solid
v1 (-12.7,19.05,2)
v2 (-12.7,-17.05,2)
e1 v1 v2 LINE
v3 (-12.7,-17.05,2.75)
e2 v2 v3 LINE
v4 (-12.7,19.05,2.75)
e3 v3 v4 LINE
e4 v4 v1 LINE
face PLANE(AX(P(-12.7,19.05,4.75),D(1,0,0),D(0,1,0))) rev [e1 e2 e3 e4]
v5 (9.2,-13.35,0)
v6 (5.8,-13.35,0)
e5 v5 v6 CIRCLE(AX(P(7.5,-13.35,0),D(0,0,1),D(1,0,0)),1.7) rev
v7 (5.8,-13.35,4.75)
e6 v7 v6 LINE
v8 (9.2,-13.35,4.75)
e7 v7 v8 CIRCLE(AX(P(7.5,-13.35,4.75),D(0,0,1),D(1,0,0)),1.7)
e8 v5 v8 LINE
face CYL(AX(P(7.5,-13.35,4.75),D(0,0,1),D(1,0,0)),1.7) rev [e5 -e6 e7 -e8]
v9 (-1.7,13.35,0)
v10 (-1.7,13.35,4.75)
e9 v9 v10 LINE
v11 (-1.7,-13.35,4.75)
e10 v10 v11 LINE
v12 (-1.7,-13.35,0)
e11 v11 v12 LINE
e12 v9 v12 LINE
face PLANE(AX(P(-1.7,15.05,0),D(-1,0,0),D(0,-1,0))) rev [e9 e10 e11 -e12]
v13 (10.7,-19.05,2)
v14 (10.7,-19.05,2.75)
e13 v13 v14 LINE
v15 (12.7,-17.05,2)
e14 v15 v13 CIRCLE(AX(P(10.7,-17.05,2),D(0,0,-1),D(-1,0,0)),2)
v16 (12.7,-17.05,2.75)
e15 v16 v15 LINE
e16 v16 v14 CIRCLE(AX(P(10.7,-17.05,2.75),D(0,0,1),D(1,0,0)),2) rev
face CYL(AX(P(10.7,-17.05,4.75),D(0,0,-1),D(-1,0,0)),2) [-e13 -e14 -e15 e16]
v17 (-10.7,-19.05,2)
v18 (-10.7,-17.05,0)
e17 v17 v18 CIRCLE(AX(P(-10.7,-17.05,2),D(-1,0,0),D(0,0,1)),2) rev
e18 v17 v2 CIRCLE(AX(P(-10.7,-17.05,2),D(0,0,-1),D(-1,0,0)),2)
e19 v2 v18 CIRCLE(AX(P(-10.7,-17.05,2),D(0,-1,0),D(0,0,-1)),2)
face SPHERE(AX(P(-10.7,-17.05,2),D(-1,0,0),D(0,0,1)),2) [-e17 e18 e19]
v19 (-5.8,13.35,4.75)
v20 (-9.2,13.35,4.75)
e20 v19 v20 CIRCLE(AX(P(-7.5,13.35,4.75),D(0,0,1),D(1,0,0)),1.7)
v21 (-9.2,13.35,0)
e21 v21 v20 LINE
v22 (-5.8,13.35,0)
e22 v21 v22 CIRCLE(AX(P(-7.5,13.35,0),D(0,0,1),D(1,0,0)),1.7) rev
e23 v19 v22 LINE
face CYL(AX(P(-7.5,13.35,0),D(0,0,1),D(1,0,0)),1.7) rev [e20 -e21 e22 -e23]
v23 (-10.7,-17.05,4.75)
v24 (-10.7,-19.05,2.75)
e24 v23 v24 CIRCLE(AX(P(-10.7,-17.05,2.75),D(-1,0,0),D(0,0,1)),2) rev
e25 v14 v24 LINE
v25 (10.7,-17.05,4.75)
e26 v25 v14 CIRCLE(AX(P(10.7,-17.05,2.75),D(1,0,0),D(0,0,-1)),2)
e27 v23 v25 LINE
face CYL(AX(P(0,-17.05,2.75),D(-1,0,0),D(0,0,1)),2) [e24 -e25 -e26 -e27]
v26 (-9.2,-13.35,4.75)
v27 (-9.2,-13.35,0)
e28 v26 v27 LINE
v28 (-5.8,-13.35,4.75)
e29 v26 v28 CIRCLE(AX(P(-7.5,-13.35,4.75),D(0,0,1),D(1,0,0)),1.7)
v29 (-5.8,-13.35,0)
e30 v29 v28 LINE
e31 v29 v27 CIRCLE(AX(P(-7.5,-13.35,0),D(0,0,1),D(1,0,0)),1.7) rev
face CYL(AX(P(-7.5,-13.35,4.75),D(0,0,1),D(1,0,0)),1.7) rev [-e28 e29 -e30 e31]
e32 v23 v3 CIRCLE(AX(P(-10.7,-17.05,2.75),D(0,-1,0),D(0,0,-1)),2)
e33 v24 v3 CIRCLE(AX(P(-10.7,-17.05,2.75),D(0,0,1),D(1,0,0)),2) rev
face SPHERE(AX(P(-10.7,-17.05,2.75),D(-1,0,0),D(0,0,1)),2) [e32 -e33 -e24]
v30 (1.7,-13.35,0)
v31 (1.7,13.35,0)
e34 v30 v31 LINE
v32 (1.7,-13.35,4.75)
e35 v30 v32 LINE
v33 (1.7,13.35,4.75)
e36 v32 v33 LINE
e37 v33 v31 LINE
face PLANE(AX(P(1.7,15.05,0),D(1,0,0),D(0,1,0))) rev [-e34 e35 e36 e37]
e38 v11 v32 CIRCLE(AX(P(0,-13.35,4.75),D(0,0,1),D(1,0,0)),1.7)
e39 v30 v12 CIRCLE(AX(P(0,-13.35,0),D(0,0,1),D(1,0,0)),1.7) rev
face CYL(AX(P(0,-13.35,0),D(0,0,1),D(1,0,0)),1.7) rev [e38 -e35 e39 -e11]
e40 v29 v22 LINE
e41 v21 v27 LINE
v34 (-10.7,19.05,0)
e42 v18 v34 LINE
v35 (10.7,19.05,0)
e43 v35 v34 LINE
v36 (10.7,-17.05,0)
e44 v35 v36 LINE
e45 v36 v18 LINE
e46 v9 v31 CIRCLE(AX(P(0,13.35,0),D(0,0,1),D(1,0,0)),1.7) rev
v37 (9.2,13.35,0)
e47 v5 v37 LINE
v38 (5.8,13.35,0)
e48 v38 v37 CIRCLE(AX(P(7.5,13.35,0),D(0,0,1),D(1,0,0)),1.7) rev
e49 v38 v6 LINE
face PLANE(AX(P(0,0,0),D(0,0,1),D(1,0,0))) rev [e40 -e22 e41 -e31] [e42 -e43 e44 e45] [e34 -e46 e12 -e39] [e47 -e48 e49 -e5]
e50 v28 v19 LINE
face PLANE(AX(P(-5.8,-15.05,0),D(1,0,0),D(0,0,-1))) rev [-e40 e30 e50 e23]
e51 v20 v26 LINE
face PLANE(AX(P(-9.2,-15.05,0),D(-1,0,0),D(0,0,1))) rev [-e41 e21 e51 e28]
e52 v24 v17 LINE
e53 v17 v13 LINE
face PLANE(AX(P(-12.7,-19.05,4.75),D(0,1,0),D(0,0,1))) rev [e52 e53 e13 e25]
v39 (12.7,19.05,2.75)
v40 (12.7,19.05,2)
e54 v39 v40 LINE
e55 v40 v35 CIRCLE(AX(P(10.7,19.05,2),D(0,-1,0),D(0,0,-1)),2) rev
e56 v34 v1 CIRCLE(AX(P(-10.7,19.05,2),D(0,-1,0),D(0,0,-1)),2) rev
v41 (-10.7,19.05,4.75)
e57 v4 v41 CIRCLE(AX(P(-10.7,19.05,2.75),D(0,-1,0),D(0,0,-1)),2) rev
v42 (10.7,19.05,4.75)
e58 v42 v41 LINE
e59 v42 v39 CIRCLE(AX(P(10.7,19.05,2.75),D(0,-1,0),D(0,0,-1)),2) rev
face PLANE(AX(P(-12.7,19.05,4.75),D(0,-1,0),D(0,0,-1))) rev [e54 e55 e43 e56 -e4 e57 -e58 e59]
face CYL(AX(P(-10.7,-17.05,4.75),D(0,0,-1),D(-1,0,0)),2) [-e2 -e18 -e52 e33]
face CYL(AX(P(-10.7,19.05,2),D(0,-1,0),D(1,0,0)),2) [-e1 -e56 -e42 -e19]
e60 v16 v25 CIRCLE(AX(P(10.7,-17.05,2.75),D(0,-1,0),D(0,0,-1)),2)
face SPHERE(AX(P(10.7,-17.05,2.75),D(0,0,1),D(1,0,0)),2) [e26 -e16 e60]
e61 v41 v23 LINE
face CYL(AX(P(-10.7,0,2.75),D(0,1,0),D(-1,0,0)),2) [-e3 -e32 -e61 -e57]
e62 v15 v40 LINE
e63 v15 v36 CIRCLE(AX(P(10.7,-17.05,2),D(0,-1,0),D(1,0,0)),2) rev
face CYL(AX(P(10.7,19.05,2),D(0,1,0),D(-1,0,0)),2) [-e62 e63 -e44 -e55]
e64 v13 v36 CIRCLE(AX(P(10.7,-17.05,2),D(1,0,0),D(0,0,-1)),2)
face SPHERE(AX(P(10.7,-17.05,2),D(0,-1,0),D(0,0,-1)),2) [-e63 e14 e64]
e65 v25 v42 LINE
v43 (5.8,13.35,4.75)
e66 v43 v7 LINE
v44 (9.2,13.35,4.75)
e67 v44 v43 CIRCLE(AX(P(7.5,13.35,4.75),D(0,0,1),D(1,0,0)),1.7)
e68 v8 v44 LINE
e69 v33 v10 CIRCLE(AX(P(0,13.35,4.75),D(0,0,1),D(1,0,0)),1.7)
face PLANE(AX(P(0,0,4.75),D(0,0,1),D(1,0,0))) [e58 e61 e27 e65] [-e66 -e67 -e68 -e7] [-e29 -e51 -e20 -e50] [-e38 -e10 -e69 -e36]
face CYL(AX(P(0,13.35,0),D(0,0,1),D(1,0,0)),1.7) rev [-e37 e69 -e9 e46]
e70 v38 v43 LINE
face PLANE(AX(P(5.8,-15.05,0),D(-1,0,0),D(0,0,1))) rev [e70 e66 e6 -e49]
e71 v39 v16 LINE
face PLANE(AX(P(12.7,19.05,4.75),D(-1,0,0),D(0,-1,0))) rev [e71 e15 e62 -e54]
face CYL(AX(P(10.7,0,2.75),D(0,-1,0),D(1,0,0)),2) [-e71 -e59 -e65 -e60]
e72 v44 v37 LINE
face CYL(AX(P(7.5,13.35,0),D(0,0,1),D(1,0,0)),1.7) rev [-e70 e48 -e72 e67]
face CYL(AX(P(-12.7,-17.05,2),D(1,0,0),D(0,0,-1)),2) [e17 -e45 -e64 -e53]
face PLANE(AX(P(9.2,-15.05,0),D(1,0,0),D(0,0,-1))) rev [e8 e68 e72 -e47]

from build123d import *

# Parameters (mm, degrees)
SKETCH1_W           = 25.4
SKETCH1_H           = 38.1
BOSS_EXTRUDE1_DEPTH = 4.75
SKETCH2_W           = 3.4
SKETCH2_H           = 30.1
CUT_EXTRUDE1_DEPTH  = 24.382792819
FILLET1_R           = 1.7
FILLET2_R           = 1.7
FILLET3_R           = 1.7
FILLET4_R           = 1.7
FILLET5_R           = 2
FILLET6_R           = 1.7
FILLET7_R           = 1.7


with BuildPart() as part:
    # Sketch1 → Boss-Extrude1 (new body)
    with BuildSketch(Plane.XY):
        Rectangle(SKETCH1_W, SKETCH1_H)
    extrude(amount=BOSS_EXTRUDE1_DEPTH)

    # Sketch2 → Cut-Extrude1 (cut, through all)
    with BuildSketch(Plane.XY.offset(4.75)):
        with Locations((7.5, 0)):
            Rectangle(SKETCH2_W, SKETCH2_H)
        with Locations((-7.5, 0)):
            Rectangle(SKETCH2_W, SKETCH2_H)
        Rectangle(SKETCH2_W, SKETCH2_H)
    extrude(amount=-CUT_EXTRUDE1_DEPTH, mode=Mode.SUBTRACT)

    # Fillet1
    fillet1_edges = [part.edges().sort_by_distance(p)[0] for p in [
        (-5.8, 15.05, 2.375),
        (-9.2, 15.05, 2.375),
    ]]
    fillet(fillet1_edges, radius=FILLET1_R - 0.0001)  # a hair under: the kernel refuses the full size

    # Fillet2
    fillet2_edges = [part.edges().sort_by_distance(p)[0] for p in [
        (-5.8, -15.05, 2.375),
        (-9.2, -15.05, 2.375),
    ]]
    fillet(fillet2_edges, radius=FILLET2_R - 0.0001)  # a hair under: the kernel refuses the full size

    # Fillet3
    fillet3_edges = [part.edges().sort_by_distance(p)[0] for p in [
        (9.2, 15.05, 2.375),
        (5.8, 15.05, 2.375),
    ]]
    fillet(fillet3_edges, radius=FILLET3_R - 0.0001)  # a hair under: the kernel refuses the full size

    # Fillet4
    fillet4_edges = [part.edges().sort_by_distance(p)[0] for p in [
        (9.2, -15.05, 2.375),
        (5.8, -15.05, 2.375),
    ]]
    fillet(fillet4_edges, radius=FILLET4_R - 0.0001)  # a hair under: the kernel refuses the full size

    # Fillet5
    fillet5_edges = [part.edges().sort_by_distance(p)[0] for p in [
        (-12.7, 0, 4.75),
        (0, -19.05, 4.75),
        (12.7, 0, 4.75),
        (0, -19.05, 0),
        (-12.7, 0, 0),
        (12.7, 0, 0),
        (12.7, -19.05, 2.375),
        (-12.7, -19.05, 2.375),
    ]]
    fillet(fillet5_edges, radius=FILLET5_R)

    # Fillet6
    fillet6_edges = [part.edges().sort_by_distance(p)[0] for p in [
        (1.7, 15.05, 2.375),
        (-1.7, 15.05, 2.375),
    ]]
    fillet(fillet6_edges, radius=FILLET6_R - 0.0001)  # a hair under: the kernel refuses the full size

    # Fillet7
    fillet7_edges = [part.edges().sort_by_distance(p)[0] for p in [
        (1.7, -15.05, 2.375),
        (-1.7, -15.05, 2.375),
    ]]
    fillet(fillet7_edges, radius=FILLET7_R - 0.0001)  # a hair under: the kernel refuses the full size


solid = part.part
